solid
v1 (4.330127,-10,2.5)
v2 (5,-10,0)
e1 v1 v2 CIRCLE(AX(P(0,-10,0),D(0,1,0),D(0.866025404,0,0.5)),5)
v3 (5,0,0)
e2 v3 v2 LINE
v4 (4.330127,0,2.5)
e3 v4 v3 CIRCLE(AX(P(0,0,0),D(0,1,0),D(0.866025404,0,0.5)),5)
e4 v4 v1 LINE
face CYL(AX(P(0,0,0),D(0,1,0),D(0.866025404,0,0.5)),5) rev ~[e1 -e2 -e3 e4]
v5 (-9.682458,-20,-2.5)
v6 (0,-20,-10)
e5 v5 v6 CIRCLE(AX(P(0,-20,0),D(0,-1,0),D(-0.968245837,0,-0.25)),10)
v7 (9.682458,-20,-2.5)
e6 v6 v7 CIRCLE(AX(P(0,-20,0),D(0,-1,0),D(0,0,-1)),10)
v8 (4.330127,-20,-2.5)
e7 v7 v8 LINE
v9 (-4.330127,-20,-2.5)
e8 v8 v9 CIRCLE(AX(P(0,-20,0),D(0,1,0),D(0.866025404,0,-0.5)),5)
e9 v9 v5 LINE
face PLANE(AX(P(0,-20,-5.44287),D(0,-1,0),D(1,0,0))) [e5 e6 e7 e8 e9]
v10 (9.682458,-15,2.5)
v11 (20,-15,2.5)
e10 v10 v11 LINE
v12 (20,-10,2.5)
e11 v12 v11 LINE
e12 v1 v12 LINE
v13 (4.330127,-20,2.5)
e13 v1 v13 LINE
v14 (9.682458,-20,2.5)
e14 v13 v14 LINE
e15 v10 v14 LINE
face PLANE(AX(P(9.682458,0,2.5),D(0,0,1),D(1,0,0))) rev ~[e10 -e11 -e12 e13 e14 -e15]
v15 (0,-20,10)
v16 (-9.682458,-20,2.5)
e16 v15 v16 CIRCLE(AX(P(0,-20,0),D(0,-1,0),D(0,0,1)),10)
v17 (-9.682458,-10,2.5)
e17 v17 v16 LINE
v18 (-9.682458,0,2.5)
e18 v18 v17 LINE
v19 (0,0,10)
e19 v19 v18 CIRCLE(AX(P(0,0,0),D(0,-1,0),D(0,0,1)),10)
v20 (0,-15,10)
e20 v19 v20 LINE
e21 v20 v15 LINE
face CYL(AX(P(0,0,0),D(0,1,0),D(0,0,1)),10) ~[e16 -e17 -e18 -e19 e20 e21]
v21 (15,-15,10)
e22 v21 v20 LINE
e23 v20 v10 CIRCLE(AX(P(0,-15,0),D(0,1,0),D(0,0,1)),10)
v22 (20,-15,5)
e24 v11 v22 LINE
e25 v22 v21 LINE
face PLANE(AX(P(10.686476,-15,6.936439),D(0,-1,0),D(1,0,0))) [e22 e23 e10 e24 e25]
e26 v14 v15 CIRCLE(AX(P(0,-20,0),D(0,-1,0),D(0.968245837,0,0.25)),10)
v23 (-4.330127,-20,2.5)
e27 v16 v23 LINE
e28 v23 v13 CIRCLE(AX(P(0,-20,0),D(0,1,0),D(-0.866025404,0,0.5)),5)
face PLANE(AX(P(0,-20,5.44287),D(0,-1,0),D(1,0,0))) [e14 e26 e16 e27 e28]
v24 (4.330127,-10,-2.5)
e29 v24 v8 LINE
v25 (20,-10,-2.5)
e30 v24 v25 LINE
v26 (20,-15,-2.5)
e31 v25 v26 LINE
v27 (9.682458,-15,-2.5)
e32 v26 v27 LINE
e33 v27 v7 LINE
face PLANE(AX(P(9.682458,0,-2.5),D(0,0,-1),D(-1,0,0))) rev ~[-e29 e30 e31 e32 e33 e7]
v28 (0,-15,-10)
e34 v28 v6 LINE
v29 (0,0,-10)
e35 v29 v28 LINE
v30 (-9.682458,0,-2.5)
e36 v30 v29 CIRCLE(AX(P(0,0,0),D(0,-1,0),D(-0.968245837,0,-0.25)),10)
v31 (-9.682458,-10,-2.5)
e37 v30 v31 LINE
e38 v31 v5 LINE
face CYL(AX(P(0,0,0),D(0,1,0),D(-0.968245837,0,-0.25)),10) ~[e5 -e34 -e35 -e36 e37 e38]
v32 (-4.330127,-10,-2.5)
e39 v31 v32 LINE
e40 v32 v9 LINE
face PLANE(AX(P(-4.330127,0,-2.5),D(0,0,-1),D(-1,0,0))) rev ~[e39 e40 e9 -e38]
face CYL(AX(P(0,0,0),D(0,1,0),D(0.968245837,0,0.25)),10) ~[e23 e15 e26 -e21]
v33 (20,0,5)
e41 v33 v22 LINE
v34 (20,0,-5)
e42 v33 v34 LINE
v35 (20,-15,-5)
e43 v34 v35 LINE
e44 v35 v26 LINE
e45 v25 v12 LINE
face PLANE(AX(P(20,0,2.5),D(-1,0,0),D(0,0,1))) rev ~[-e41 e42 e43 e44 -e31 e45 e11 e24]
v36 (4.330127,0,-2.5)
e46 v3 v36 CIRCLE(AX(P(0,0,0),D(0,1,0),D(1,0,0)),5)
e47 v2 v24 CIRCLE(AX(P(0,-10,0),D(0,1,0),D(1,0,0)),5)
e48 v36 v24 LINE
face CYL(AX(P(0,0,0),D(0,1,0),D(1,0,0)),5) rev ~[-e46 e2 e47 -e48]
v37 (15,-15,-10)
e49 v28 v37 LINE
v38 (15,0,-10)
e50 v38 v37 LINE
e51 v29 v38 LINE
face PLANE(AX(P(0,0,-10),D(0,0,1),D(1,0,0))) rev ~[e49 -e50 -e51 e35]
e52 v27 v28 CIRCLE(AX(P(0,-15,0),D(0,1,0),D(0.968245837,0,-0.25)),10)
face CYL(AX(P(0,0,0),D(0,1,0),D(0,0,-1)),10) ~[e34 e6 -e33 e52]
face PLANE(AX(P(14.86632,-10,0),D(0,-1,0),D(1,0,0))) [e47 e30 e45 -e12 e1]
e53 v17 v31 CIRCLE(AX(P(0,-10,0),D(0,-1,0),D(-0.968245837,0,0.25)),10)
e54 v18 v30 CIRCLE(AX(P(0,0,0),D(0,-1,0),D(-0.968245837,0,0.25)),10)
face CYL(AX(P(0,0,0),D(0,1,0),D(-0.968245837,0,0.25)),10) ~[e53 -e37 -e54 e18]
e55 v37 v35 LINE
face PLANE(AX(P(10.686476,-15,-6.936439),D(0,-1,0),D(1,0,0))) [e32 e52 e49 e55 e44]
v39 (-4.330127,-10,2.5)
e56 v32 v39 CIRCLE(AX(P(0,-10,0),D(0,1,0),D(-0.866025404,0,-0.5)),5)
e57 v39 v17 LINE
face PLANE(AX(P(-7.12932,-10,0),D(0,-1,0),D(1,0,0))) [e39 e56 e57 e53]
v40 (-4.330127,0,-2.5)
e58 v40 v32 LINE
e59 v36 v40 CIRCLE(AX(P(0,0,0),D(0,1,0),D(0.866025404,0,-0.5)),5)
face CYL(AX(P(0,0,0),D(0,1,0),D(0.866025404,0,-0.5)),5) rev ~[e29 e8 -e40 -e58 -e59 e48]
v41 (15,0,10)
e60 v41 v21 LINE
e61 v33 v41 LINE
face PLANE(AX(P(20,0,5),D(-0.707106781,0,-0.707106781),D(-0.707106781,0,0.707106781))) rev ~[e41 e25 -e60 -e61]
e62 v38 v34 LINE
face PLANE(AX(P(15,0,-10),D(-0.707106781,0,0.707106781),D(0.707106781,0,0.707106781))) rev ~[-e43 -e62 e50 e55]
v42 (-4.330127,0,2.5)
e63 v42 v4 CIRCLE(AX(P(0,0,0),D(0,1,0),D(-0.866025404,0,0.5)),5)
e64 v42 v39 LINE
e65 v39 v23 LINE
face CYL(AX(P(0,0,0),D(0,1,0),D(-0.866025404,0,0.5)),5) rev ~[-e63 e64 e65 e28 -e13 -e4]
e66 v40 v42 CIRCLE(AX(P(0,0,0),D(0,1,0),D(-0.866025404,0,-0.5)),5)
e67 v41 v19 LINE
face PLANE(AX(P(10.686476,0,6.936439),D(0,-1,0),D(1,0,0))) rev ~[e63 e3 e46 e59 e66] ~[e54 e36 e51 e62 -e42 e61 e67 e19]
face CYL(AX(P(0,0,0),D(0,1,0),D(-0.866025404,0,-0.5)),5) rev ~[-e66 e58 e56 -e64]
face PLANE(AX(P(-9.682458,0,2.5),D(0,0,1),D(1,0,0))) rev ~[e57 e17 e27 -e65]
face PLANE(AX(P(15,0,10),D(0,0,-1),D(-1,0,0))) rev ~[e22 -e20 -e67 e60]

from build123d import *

# Parameters (mm, degrees)
F1_DEPTH = 20
F2_DEPTH = 10
F3_DEPTH = 15


with BuildPart() as f1:
    # F0 (on Front) → F1 (new body)
    with BuildSketch(Plane.XZ):
        with BuildLine():
            ThreePointArc((9.6824583655, 2.5), (6.123724357, 7.9056941504), (0, 10))
            ThreePointArc((0, 10), (-6.123724357, 7.9056941504), (-9.6824583655, 2.5))
            Line((-9.6824583655, 2.5), (-4.3301270189, 2.5))
            ThreePointArc((-4.3301270189, 2.5), (0, 5), (4.3301270189, 2.5))
            Line((4.3301270189, 2.5), (9.6824583655, 2.5))
        make_face()
    extrude(amount=F1_DEPTH)



with BuildPart() as f1b:
    # F0 (on Front) → F1, piece 2 (new body)
    with BuildSketch(Plane.XZ):
        with BuildLine():
            Line((-4.3301270189, -2.5), (-9.6824583655, -2.5))
            ThreePointArc((-9.6824583655, -2.5), (-6.123724357, -7.9056941504), (0, -10))
            ThreePointArc((0, -10), (6.123724357, -7.9056941504), (9.6824583655, -2.5))
            Line((9.6824583655, -2.5), (4.3301270189, -2.5))
            ThreePointArc((4.3301270189, -2.5), (0, -5), (-4.3301270189, -2.5))
        make_face()
    extrude(amount=F1_DEPTH)


with BuildPart() as f1_1:
    add(f1.part)

    add(f1b.part)  # F2 merges F1b
    # F0 (on Front) → F2 (join)
    with BuildSketch(Plane.XZ):
        with BuildLine():
            Line((20, 2.5), (9.6824583655, 2.5))
            ThreePointArc((9.6824583655, 2.5), (9.9202969627, 1.2600429248), (10, 0))
            ThreePointArc((10, 0), (9.9202969627, -1.2600429248), (9.6824583655, -2.5))
            Line((9.6824583655, -2.5), (20, -2.5))
            Line((20, -2.5), (20, 0))
            Line((20, 0), (20, 2.5))
        make_face()
        with BuildLine():
            ThreePointArc((10, 0), (9.9202969627, 1.2600429248), (9.6824583655, 2.5))
            Line((9.6824583655, 2.5), (4.3301270189, 2.5))
            ThreePointArc((4.3301270189, 2.5), (4.8296291314, 1.2940952255), (5, 0))
            ThreePointArc((5, 0), (4.8296291314, -1.2940952255), (4.3301270189, -2.5))
            Line((4.3301270189, -2.5), (9.6824583655, -2.5))
            ThreePointArc((9.6824583655, -2.5), (9.9202969627, -1.2600429248), (10, 0))
        make_face()
        with BuildLine():
            Line((-4.3301270189, 2.5), (-9.6824583655, 2.5))
            ThreePointArc((-9.6824583655, 2.5), (-10, 0), (-9.6824583655, -2.5))
            Line((-9.6824583655, -2.5), (-4.3301270189, -2.5))
            ThreePointArc((-4.3301270189, -2.5), (-5, 0), (-4.3301270189, 2.5))
        make_face()
    extrude(amount=F2_DEPTH)

    # F0 (on Front) → F3 (join)
    with BuildSketch(Plane.XZ):
        with BuildLine():
            Line((15, 10), (0, 10))
            ThreePointArc((0, 10), (6.123724357, 7.9056941504), (9.6824583655, 2.5))
            Line((9.6824583655, 2.5), (20, 2.5))
            Line((20, 2.5), (20, 5))
            Line((20, 5), (15, 10))
        make_face()
        with BuildLine():
            ThreePointArc((9.6824583655, -2.5), (6.123724357, -7.9056941504), (0, -10))
            Line((0, -10), (15, -10))
            Line((15, -10), (20, -5))
            Line((20, -5), (20, -2.5))
            Line((20, -2.5), (9.6824583655, -2.5))
        make_face()
    extrude(amount=F3_DEPTH)


solid = f1_1.part
